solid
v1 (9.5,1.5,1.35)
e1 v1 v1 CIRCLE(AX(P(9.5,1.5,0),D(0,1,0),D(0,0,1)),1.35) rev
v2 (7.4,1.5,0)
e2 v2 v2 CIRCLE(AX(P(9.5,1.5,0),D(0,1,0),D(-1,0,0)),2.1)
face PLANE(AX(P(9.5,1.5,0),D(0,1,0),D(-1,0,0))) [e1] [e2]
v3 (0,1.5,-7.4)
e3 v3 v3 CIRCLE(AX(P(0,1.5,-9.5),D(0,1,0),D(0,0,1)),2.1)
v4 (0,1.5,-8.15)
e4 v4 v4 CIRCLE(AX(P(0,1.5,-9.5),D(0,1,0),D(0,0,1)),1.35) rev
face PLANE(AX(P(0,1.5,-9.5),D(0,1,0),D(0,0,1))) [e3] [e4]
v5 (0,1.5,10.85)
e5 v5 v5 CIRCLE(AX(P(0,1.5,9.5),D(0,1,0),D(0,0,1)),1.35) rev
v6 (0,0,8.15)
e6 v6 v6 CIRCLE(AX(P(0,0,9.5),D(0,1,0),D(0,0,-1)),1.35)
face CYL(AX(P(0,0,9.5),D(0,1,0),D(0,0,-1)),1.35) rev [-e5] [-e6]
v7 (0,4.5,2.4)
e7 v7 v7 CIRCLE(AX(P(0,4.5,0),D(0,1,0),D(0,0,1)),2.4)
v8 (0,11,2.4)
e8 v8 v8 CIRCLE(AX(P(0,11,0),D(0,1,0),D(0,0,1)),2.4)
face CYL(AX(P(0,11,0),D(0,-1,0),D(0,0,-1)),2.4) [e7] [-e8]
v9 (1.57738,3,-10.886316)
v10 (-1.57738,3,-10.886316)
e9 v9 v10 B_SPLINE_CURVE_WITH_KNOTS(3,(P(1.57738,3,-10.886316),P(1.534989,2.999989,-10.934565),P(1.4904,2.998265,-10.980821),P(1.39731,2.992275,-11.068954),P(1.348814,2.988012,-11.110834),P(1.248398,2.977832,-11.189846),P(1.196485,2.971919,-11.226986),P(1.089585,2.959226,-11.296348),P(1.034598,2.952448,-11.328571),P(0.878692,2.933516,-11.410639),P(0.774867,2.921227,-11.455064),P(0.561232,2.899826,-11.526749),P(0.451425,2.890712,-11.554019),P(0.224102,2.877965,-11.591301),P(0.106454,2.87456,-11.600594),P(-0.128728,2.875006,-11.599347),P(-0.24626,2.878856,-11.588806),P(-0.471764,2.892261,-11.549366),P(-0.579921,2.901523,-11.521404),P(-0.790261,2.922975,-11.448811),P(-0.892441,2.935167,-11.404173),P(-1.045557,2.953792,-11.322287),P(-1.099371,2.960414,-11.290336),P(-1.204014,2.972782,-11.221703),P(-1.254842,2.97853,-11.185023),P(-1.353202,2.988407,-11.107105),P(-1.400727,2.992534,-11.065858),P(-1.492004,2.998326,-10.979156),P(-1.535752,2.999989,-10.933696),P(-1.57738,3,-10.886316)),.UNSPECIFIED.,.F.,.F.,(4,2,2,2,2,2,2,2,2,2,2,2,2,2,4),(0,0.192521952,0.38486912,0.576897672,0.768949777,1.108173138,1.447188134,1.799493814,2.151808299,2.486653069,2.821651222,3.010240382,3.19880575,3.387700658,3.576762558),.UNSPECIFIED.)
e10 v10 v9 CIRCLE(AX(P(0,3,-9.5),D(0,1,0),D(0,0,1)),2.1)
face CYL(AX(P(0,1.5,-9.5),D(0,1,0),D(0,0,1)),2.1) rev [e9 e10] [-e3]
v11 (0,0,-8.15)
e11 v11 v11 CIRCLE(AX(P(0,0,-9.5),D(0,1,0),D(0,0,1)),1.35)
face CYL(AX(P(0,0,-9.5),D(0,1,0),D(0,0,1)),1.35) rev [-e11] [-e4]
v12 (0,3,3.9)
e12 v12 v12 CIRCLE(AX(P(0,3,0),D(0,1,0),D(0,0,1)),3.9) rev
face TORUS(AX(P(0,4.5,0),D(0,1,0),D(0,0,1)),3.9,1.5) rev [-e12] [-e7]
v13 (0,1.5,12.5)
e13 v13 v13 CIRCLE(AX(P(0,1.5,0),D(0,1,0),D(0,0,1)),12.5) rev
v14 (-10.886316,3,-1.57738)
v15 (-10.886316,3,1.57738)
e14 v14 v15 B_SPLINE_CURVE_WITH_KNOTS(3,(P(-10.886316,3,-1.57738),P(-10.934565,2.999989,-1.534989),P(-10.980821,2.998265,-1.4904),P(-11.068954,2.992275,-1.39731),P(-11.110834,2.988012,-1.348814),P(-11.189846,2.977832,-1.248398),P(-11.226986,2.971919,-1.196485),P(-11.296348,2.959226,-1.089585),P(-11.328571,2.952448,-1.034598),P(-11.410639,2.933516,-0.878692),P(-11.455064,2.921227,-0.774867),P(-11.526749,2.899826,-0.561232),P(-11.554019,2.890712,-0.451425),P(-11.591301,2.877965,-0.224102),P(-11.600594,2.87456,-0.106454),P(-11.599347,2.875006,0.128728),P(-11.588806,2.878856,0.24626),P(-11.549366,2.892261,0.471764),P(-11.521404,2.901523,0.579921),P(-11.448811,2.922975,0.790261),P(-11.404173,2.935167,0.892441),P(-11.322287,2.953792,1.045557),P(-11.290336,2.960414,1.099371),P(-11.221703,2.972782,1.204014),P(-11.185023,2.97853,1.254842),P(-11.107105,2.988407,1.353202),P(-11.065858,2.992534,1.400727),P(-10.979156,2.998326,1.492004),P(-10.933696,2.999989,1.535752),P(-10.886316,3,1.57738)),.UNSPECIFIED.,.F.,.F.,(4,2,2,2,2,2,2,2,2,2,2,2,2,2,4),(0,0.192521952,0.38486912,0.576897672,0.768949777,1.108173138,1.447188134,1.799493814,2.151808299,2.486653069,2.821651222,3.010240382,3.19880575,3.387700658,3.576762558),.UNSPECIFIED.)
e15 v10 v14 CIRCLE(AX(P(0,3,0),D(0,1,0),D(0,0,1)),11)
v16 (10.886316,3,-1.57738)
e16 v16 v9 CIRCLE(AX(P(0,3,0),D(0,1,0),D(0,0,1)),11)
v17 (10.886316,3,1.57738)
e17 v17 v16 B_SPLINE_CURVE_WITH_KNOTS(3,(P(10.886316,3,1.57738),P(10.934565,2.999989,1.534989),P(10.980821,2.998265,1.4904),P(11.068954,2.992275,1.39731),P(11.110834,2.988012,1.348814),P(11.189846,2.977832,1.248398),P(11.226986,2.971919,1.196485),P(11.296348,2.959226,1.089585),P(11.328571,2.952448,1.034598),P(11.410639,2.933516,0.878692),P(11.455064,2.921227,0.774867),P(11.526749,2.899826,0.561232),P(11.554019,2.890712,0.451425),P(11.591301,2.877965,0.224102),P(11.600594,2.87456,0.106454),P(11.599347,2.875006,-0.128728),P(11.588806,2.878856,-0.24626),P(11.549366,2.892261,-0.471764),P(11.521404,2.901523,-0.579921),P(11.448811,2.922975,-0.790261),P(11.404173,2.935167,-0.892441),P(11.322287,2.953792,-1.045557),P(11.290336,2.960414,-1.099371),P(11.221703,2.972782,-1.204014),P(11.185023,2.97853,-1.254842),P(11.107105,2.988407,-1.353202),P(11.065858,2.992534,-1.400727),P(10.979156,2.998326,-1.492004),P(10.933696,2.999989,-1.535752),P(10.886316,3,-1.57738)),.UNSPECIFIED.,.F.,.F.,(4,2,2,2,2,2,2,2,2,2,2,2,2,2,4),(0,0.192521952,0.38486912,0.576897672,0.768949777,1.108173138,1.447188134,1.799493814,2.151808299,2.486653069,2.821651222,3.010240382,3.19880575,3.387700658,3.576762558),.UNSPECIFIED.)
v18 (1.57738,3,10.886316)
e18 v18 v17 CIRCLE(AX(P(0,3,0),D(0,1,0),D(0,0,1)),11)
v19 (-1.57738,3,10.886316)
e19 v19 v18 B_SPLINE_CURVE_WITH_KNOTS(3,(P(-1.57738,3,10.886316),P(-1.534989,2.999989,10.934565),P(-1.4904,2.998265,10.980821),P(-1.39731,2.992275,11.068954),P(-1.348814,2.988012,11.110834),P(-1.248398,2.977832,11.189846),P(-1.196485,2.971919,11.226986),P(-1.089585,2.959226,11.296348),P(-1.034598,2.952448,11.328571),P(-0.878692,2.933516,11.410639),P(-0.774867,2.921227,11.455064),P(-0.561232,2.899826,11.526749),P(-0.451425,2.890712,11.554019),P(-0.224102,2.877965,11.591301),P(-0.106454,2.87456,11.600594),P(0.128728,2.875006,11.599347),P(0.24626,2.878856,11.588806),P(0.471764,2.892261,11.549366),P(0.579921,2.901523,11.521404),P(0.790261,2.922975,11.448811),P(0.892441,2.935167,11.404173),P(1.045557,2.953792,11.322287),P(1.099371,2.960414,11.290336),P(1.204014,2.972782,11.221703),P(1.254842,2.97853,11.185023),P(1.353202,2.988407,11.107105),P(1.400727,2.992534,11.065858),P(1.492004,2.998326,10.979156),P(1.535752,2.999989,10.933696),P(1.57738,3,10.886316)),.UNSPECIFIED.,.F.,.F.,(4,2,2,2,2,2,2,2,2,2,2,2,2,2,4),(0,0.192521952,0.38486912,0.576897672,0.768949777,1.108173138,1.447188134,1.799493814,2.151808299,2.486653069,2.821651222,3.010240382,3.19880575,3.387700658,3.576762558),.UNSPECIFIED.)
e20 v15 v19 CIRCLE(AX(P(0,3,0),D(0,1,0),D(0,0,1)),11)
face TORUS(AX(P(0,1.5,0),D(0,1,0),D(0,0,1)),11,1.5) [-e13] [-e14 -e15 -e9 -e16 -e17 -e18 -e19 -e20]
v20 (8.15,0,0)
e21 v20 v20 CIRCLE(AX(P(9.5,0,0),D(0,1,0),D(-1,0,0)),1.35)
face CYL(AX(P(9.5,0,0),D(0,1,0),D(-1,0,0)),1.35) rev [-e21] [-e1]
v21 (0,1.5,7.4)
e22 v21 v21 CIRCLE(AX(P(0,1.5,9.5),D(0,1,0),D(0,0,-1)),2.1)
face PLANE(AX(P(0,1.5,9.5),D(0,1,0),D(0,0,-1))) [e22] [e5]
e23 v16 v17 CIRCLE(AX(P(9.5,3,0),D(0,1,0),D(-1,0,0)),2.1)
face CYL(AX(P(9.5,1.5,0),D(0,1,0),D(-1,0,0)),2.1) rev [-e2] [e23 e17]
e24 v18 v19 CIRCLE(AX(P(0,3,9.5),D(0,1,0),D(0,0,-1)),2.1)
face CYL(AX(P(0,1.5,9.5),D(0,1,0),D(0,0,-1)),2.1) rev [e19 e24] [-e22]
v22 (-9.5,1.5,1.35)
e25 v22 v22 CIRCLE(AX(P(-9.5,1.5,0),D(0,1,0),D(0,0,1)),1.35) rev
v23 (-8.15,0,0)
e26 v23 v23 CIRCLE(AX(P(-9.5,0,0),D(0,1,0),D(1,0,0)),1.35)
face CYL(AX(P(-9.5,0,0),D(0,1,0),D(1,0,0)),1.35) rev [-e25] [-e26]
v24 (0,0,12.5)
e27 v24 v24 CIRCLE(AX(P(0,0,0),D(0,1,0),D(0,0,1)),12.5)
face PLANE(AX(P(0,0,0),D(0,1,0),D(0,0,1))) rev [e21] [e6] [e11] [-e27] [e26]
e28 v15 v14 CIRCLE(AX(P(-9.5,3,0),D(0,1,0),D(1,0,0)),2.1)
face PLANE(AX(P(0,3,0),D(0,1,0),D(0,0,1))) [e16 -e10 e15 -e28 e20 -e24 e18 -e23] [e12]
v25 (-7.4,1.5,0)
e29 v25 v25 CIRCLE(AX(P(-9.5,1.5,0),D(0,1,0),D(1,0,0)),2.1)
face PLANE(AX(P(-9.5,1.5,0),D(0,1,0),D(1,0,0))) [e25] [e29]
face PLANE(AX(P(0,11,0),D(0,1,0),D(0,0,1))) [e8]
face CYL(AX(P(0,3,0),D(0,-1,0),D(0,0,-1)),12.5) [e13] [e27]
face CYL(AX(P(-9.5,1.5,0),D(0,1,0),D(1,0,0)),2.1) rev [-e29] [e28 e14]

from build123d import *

# Parameters (mm, degrees)
SKETCH1_R           = 12.5
BOSS_EXTRUDE1_DEPTH = 3
SKETCH2_R           = 1.35
CUT_EXTRUDE1_DEPTH  = 18.930421077
SKETCH4_R           = 2.1
CUT_EXTRUDE2_DEPTH  = 1.5
CIRPATTERN1_COUNT   = 4
SKETCH3_R           = 2.4
BOSS_EXTRUDE2_DEPTH = 8
FILLET1_R           = 1.5


with BuildPart() as part:
    # Sketch1 → Boss-Extrude1 (new body)
    with BuildSketch(Plane(origin=(0, 0, 0), x_dir=(1, 0, 0), z_dir=(0, 1, 0))):
        with Locations(Location((0, 0, 0), (0, 0, 270))):
            Circle(SKETCH1_R)
    extrude(amount=BOSS_EXTRUDE1_DEPTH)

    # Sketch2 → Cut-Extrude1 (cut, through all)
    with BuildSketch(Plane(origin=(0, 3, 0), x_dir=(1, 0, 0), z_dir=(0, 1, 0))):
        with Locations(Location((0, 9.5, 0), (0, 0, 270))):
            Circle(SKETCH2_R)
    cut_extrude1 = extrude(amount=-CUT_EXTRUDE1_DEPTH, mode=Mode.SUBTRACT)

    # Sketch4 → Cut-Extrude2 (cut)
    with BuildSketch(Plane(origin=(0, 3, 0), x_dir=(1, 0, 0), z_dir=(0, 1, 0))):
        with Locations(Location((0, 9.5, 0), (0, 0, 270))):
            Circle(SKETCH4_R)
    cut_extrude2 = extrude(amount=-CUT_EXTRUDE2_DEPTH, mode=Mode.SUBTRACT)

    # CirPattern1: Cut-Extrude1, Cut-Extrude2 ×4 about axis
    cirpattern1_axis = Axis((0, 0, 0), (0, 1, 0))
    add([cut_extrude1.rotate(cirpattern1_axis, i * 360 / CIRPATTERN1_COUNT) for i in range(1, CIRPATTERN1_COUNT)], mode=Mode.SUBTRACT)
    add([cut_extrude2.rotate(cirpattern1_axis, i * 360 / CIRPATTERN1_COUNT) for i in range(1, CIRPATTERN1_COUNT)], mode=Mode.SUBTRACT)

    # Sketch3 → Boss-Extrude2 (add)
    with BuildSketch(Plane(origin=(0, 3, 0), x_dir=(1, 0, 0), z_dir=(0, 1, 0))):
        with Locations(Location((0, 0, 0), (0, 0, 270))):
            Circle(SKETCH3_R)
    extrude(amount=BOSS_EXTRUDE2_DEPTH)

    # Fillet1
    # the kernel refuses this fillet: 1.5 mm, written as the material it adds along each edge
    with BuildSketch(Plane(origin=(0, 3, 0), x_dir=(0, 0, 1), z_dir=(-1, 0, 0))) as fillet1_piece_1:
        with BuildLine():
            CenterArc((2.4 + FILLET1_R, FILLET1_R), FILLET1_R, 180, 90)
            Line((2.4, FILLET1_R), (2.4, 0))
            Line((2.4, 0), (2.4 + FILLET1_R, 0))
        make_face()
    revolve(axis=Axis((0, 3, 0), (0, 1, 0)))
    # the kernel refuses this fillet: 1.5 mm, written as the material it takes off along each edge
    with BuildSketch(Plane(origin=(0, 3, 0), x_dir=(0, 0, 1), z_dir=(-1, 0, 0))) as fillet1_2_piece_1:
        with BuildLine():
            CenterArc((12.5 - FILLET1_R, -FILLET1_R), FILLET1_R, 0, 90)
            Line((12.5 - FILLET1_R, 0), (12.5, 0))
            Line((12.5, 0), (12.5, -FILLET1_R))
        make_face()
    revolve(axis=Axis((0, 3, 0), (0, 1, 0)), mode=Mode.SUBTRACT)


solid = part.part
